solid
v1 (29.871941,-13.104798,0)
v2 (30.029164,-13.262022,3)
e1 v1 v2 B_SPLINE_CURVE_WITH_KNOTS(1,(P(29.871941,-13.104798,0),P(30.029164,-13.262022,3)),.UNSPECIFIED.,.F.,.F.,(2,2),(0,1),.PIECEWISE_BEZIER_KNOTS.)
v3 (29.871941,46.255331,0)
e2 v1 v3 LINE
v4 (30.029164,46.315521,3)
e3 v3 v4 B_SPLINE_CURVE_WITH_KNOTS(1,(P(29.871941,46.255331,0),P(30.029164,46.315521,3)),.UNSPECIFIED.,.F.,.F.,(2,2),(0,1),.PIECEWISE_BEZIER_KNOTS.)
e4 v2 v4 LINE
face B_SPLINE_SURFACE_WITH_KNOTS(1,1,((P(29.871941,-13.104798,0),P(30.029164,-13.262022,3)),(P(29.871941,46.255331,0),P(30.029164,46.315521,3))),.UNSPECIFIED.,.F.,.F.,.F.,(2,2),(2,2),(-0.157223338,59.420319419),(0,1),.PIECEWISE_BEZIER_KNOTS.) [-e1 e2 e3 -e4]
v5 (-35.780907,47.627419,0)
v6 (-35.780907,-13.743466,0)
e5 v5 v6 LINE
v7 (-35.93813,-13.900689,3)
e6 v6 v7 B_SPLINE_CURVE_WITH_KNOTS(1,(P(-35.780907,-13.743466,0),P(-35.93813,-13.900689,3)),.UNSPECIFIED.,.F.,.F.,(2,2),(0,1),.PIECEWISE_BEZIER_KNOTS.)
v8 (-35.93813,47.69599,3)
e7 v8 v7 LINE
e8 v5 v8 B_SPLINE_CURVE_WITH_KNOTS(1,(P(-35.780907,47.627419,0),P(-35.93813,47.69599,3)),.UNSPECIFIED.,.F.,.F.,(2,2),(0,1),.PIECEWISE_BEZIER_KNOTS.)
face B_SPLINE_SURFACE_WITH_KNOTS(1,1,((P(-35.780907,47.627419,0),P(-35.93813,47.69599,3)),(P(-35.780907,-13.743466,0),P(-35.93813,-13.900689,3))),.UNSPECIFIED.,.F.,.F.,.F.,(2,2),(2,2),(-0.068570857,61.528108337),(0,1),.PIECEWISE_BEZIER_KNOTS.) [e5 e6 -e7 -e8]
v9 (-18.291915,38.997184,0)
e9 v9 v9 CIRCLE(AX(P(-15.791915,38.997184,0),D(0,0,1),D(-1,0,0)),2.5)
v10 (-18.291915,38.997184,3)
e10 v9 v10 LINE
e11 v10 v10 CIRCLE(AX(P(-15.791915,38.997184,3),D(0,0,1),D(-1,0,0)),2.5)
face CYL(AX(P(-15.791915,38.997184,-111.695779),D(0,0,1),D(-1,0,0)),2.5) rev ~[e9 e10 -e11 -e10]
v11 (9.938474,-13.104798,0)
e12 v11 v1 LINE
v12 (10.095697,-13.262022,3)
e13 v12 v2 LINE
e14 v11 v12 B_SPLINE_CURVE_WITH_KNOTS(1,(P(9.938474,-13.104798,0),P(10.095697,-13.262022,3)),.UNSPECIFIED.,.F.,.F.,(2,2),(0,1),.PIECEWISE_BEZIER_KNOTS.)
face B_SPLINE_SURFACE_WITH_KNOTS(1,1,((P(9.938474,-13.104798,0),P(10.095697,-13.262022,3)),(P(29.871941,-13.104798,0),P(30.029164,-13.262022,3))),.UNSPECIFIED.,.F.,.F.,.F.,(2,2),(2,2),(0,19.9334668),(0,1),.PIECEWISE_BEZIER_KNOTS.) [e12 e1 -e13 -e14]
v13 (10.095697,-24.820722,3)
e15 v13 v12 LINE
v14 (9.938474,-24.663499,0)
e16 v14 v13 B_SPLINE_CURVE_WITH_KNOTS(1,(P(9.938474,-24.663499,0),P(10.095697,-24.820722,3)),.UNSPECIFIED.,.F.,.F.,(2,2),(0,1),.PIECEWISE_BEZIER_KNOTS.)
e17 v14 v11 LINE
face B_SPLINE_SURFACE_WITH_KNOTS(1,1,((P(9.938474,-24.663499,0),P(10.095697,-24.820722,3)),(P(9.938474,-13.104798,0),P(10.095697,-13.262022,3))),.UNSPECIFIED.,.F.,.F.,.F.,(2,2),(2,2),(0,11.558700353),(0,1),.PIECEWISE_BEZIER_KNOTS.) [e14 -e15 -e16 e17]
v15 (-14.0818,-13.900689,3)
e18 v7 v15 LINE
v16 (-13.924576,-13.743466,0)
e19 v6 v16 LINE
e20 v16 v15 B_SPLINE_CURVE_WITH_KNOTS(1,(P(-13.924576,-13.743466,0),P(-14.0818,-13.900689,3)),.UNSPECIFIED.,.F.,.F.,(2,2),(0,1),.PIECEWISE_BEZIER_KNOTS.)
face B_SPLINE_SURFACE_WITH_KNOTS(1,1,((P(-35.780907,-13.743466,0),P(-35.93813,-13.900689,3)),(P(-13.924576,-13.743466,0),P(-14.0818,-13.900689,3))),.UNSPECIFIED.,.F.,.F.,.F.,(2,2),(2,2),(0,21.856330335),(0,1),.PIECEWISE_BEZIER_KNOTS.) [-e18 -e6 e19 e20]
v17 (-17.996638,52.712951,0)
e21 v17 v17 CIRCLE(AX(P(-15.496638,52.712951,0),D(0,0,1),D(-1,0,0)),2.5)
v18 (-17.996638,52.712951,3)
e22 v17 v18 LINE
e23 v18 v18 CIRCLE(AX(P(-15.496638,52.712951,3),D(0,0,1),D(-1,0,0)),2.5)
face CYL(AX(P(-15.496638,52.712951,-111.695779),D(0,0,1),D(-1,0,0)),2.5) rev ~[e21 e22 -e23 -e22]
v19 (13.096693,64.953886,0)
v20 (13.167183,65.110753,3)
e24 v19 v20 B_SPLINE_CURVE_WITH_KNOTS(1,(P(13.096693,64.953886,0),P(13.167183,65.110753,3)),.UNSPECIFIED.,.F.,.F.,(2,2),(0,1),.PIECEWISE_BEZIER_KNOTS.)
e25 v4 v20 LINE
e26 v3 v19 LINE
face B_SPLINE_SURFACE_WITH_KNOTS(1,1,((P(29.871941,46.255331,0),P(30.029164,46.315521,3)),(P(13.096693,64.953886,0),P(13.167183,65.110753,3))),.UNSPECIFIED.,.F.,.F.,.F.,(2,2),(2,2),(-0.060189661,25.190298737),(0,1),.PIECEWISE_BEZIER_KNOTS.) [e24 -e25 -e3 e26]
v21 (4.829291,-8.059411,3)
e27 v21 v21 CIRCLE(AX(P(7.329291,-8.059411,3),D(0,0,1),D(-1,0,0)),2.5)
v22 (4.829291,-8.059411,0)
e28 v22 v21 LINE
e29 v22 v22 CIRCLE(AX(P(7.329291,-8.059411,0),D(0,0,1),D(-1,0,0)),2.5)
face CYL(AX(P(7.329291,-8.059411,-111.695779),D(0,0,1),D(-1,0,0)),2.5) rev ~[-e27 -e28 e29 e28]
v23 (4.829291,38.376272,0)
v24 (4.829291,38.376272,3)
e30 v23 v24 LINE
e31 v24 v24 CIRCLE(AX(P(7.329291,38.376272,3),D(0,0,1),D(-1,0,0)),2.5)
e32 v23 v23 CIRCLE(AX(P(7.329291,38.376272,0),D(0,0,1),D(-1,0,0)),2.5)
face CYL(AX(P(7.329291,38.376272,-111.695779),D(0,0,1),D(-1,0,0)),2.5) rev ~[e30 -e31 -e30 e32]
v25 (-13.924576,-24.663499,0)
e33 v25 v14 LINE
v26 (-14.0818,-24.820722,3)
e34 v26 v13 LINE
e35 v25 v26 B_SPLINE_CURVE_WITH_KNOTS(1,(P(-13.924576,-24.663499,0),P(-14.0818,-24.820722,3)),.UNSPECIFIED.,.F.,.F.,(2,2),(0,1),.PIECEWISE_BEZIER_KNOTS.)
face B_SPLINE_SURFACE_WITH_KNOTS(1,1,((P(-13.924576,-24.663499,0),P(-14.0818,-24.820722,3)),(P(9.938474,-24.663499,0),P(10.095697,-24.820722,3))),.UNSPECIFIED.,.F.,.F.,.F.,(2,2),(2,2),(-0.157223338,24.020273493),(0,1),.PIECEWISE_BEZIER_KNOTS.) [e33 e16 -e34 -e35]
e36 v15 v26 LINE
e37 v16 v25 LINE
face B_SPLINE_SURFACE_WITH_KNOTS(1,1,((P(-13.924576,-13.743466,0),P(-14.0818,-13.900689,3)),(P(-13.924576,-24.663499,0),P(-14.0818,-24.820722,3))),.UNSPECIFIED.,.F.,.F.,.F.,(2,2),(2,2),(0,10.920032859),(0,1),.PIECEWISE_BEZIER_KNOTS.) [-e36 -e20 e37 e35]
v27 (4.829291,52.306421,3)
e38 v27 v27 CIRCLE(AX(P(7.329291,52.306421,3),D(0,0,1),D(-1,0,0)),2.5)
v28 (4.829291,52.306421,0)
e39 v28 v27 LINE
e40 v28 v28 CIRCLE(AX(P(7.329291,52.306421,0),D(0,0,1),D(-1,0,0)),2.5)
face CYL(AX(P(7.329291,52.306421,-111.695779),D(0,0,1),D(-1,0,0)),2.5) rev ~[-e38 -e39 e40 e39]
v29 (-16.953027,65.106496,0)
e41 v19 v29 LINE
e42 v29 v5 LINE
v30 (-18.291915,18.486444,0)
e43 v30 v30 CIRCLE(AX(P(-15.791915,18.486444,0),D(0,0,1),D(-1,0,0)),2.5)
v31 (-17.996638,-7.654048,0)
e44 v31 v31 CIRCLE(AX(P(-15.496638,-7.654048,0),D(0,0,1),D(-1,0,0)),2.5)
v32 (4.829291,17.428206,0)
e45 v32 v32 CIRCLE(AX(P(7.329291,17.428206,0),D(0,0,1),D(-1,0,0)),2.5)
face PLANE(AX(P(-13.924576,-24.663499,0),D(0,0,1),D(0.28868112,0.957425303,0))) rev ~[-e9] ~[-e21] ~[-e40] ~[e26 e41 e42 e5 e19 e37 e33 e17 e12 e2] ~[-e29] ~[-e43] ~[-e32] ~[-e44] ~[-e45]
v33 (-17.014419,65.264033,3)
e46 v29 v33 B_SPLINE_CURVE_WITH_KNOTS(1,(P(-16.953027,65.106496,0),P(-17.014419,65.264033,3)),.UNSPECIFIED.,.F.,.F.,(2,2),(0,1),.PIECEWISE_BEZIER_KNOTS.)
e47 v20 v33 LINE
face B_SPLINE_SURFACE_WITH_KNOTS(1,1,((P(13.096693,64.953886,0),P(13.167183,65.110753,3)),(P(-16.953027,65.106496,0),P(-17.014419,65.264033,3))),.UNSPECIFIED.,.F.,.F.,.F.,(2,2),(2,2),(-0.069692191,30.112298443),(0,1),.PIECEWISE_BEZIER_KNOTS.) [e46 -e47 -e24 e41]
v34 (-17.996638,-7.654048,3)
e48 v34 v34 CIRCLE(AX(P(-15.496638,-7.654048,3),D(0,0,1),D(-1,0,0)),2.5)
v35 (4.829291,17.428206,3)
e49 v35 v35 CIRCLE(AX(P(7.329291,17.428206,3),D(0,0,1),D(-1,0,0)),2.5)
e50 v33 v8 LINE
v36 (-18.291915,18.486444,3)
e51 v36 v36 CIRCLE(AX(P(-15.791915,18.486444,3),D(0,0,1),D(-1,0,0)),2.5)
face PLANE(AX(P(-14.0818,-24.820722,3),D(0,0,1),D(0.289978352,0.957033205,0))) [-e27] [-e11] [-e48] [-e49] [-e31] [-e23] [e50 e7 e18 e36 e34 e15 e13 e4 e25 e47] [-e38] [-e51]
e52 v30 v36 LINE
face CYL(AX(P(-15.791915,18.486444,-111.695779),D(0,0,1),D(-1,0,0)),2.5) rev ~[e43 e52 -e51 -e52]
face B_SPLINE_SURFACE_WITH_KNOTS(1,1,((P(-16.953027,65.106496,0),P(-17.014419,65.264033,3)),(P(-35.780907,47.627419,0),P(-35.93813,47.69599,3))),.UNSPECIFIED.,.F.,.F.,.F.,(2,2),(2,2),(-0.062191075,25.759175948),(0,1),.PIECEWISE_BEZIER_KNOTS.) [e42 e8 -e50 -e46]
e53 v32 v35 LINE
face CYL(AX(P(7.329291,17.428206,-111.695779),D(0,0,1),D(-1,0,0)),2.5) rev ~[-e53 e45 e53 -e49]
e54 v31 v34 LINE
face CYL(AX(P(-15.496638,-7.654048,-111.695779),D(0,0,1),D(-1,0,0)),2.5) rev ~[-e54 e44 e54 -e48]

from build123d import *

# Parameters (mm, degrees)
F2_DEPTH   = 3
F2_TAPER   = -3
F6_D       = 5
F6_ON_F4_D = 5


# Not quite as in the source:
# - the program builds the solid bodies; features that only make, move or delete a surface that nothing else refers to are left out


with BuildPart() as f2:
    # F0 (on Top) → F2 (new body)
    with BuildSketch(Plane.XY):
        Polygon((-13.9245763421, -24.6634986252), (9.9384738132, -24.6634986252), (9.9384738132, -13.1047982723), (29.8719406128, -13.1047982723), (29.8719406128, 46.2553314865), (13.0966929719, 64.9538859725), (-16.9530268759, 65.1064962149), (-35.7809066772, 47.6274192333), (-35.7809066772, -13.7434657663), (-13.9245763421, -13.7434657663), align=None)
    extrude(amount=F2_DEPTH, taper=F2_TAPER)

    # F6 (through all)
    with Locations(Plane(origin=(0, 0, 0), x_dir=(1, 0, 0), z_dir=(0, 0, -1))):
        with Locations((-15.4966376722, -52.7129508555), (7.3292911984, -52.3064211011), (7.3292911984, -38.3762717247), (7.3292911984, -17.4282062799), (-15.4966376722, 7.6540475711), (7.3292911984, 8.0594113097)):
            Hole(F6_D / 2)

    # F6 on F4 (through all)
    with Locations(Plane(origin=(0, 0, 0), x_dir=(1, 0, 0), z_dir=(0, 0, -1))):
        with Locations((-15.7919153571, -38.9971844852), (-15.7919153571, -18.486443907)):
            Hole(F6_ON_F4_D / 2)


solid = f2.part
